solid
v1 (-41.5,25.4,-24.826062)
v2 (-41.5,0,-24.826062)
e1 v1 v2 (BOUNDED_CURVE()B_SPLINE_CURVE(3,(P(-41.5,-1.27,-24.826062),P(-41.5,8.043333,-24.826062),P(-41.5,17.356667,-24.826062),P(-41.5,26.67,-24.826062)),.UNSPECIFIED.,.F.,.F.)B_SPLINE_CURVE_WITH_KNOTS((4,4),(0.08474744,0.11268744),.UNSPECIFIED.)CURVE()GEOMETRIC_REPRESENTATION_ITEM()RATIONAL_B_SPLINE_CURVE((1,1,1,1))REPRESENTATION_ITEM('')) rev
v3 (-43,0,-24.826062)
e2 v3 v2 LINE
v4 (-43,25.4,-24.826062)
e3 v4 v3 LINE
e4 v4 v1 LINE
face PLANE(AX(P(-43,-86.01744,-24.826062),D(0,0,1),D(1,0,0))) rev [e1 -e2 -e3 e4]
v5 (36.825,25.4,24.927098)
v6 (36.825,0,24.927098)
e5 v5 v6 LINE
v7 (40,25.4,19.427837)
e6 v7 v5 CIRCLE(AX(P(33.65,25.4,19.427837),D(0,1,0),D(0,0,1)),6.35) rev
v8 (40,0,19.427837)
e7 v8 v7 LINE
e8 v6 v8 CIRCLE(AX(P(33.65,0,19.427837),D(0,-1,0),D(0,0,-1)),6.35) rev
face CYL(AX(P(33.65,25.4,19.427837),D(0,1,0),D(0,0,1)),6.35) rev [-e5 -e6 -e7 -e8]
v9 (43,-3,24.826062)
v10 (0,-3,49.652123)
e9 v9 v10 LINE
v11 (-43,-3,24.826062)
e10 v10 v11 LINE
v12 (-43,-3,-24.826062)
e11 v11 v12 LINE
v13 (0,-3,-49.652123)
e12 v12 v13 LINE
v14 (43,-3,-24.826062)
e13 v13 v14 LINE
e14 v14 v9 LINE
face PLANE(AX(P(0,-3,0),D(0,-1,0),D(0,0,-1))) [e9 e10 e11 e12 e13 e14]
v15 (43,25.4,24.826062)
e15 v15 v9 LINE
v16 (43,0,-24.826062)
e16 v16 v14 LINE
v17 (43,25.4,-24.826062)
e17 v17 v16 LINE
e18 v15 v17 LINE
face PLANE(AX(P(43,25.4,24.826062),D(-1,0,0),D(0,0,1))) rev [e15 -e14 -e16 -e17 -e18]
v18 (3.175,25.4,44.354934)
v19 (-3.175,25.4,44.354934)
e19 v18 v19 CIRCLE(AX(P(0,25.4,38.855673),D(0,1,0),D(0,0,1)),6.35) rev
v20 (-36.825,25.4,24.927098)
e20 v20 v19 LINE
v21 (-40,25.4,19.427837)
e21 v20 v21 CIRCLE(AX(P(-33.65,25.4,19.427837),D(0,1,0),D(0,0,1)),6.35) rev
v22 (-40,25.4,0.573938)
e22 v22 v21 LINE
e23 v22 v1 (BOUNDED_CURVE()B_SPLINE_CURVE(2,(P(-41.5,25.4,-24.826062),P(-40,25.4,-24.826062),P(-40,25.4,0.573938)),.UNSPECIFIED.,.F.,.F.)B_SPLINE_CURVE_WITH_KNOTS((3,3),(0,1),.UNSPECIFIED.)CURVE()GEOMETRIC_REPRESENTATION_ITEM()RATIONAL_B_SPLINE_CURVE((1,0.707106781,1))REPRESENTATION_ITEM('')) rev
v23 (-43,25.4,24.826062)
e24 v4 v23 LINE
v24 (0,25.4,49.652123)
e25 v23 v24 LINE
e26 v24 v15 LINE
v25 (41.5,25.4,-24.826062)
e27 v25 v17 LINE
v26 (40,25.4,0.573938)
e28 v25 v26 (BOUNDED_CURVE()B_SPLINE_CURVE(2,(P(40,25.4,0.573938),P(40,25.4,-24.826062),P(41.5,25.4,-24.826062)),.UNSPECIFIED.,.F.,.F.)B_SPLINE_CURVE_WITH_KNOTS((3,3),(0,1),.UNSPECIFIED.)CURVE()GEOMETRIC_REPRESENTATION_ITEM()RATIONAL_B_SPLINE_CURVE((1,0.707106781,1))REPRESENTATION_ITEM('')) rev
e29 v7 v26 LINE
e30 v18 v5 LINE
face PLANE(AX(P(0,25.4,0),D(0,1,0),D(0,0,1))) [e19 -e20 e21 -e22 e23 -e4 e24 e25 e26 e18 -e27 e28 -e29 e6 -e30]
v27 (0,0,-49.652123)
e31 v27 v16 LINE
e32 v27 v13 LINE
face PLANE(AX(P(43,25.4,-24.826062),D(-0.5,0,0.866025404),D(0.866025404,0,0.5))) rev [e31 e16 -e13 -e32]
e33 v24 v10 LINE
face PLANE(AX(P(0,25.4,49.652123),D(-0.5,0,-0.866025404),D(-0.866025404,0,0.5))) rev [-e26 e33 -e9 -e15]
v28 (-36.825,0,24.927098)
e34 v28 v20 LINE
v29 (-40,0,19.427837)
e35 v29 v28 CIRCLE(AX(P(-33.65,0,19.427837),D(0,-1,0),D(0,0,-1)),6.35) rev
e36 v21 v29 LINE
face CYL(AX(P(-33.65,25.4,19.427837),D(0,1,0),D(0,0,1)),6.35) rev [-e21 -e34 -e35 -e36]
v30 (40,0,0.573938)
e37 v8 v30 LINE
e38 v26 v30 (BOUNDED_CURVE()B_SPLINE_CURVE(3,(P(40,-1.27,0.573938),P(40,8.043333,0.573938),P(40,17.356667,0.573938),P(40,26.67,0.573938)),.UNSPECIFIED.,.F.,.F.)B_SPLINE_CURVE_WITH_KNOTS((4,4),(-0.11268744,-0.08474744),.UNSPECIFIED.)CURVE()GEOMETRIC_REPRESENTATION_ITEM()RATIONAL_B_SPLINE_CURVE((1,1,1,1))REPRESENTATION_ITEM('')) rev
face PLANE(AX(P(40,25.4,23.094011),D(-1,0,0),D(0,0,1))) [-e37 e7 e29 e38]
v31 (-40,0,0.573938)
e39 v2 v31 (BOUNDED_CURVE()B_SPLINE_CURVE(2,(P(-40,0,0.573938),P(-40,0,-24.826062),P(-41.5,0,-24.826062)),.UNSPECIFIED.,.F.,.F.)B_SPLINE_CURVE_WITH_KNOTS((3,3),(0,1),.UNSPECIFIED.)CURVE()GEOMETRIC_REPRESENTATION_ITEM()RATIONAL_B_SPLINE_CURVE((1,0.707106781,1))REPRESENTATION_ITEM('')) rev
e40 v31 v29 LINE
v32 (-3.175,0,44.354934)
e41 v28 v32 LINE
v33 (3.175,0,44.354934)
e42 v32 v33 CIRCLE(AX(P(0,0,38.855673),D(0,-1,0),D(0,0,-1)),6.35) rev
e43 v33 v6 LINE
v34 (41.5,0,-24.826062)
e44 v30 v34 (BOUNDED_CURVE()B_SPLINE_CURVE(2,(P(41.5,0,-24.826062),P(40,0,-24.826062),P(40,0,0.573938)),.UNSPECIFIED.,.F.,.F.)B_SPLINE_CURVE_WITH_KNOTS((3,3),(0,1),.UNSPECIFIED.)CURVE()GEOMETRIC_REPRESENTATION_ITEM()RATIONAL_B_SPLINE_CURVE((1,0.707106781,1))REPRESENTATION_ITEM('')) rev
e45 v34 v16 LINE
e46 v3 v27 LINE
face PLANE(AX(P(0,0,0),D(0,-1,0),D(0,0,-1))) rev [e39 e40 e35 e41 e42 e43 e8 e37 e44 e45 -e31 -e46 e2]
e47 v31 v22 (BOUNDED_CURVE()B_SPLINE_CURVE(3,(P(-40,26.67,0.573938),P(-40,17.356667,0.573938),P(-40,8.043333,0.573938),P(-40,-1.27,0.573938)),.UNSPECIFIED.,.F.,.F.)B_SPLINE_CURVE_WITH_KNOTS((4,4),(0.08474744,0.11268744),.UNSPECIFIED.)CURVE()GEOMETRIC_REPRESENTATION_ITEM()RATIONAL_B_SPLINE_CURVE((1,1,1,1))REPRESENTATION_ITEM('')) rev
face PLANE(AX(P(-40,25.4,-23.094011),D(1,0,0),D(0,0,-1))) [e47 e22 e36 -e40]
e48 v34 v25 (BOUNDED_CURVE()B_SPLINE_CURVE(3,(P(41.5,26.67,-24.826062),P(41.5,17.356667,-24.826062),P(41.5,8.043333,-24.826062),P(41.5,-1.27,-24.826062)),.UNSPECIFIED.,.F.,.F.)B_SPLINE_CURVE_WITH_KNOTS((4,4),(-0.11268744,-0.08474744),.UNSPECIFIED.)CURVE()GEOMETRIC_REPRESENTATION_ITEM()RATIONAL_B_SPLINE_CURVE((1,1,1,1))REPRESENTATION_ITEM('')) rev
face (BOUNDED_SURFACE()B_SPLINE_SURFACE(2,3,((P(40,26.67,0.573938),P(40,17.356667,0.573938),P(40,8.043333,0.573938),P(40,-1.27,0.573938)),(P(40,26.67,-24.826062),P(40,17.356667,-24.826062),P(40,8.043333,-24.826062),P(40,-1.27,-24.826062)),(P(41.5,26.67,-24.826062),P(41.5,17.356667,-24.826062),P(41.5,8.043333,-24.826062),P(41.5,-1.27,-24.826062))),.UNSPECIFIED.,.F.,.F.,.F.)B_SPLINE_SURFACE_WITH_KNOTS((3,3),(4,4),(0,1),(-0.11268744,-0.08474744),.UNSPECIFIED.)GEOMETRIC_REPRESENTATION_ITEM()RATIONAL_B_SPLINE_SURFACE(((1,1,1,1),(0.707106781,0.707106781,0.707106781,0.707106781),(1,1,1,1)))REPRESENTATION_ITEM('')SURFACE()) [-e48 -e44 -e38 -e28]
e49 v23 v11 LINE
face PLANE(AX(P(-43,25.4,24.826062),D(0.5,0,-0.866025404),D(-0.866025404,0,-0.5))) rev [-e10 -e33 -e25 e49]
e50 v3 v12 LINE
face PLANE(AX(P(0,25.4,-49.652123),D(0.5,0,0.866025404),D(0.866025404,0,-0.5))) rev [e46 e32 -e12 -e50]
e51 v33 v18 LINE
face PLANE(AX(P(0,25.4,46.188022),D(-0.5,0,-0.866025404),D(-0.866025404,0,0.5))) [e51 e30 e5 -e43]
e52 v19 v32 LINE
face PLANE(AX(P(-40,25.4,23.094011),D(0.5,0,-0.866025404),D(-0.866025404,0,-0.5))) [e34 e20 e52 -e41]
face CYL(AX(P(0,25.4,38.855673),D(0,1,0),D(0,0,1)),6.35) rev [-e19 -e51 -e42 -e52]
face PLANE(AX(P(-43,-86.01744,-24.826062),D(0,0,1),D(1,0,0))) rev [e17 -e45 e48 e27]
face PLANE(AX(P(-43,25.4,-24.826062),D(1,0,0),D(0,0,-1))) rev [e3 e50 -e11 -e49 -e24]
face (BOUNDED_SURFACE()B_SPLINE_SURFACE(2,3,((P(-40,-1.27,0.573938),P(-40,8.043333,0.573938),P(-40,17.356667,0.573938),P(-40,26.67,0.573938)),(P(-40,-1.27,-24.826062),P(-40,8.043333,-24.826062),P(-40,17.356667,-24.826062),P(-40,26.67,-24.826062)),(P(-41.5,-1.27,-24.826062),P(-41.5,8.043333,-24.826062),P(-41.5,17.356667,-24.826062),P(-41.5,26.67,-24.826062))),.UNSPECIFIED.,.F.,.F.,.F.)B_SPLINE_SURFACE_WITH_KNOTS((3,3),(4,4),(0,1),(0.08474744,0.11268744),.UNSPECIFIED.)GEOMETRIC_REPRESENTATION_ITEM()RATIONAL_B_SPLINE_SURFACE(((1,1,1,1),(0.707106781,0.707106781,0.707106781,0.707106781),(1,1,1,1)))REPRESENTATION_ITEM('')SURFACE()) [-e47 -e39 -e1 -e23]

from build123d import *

# Parameters (mm, degrees)
BOSS_EXTRUDE1_DEPTH = 25.4
BOSS_EXTRUDE2_DEPTH = 3
CUT_EXTRUDE1_DEPTH  = 25.4
SKETCH3_W           = 86
SKETCH3_H           = 1.732050808
CUT_EXTRUDE2_DEPTH  = 25.4
FILLET1_SIZE        = 1.5
FILLET1_SIZE_2      = 25.4
FILLET2_R           = 6.35


# Read off the part's stored shape, not the designer's step: Cut-Extrude1
with BuildPart() as part:
    # Sketch1 → Boss-Extrude1 (new body)
    with BuildSketch(Plane(origin=(0, 0, 0), x_dir=(1, 0, 0), z_dir=(0, 1, 0))):
        Polygon((43, 24.826061575), (0, 49.65212315), (-43, 24.826061575), (-43, -24.826061575), (0, -49.65212315), (43, -24.826061575), align=None)
        Polygon((-40, -23.094010768), (0, -46.188021535), (40, -23.094010768), (40, 23.094010768), (0, 46.188021535), (-40, 23.094010768), align=None, mode=Mode.SUBTRACT)
    extrude(amount=BOSS_EXTRUDE1_DEPTH)

    # Sketch2 → Boss-Extrude2 (add)
    with BuildSketch(Plane.XZ):
        Polygon((43, 24.826061575), (0, 49.65212315), (-43, 24.826061575), (-43, -24.826061575), (0, -49.65212315), (43, -24.826061575), align=None)
    extrude(amount=BOSS_EXTRUDE2_DEPTH)

    # Cut-Extrude1 outline → Cut-Extrude1 (cut)
    with BuildSketch(Plane(origin=(0, 0, 0), x_dir=(1, 0, 0), z_dir=(0, 1, 0))):
        Polygon((40, 26.558112383), (0, 49.65212315), (-40, 26.558112383), (-40, 23.094010768), (0, 46.188021535), (40, 23.094010768), align=None)
    extrude(amount=CUT_EXTRUDE1_DEPTH, mode=Mode.SUBTRACT)

    # Sketch3 → Cut-Extrude2 (cut)
    with BuildSketch(Plane(origin=(0, 25.4, 0), x_dir=(1, 0, 0), z_dir=(0, 1, 0))):
        with Locations((0, 25.692086979)):
            Rectangle(SKETCH3_W, SKETCH3_H)
    extrude(amount=-CUT_EXTRUDE2_DEPTH, mode=Mode.SUBTRACT)

    # Fillet1
    # an asymmetric fillet: 25.4, 1.5 mm, written as the material it takes off along each edge
    with BuildSketch(Plane(origin=(40, 0, -24.826061575), x_dir=(1, 0, 0), z_dir=(0, 1, 0)), Plane(origin=(-40, 88.9, -24.826061575), x_dir=(-1, 0, 0), z_dir=(0, -1, 0))) as fillet1_piece_1:
        with BuildLine():
            Bezier((FILLET1_SIZE, 0), (0, 0), (0, -FILLET1_SIZE_2), weights=[1, 0.707106781, 1])
            Line((0, -FILLET1_SIZE_2), (0, 0))
            Line((0, 0), (FILLET1_SIZE, 0))
        make_face()
    extrude(amount=88.9, mode=Mode.SUBTRACT)

    # Fillet2
    fillet2_edges = [part.edges().sort_by_distance(p)[0] for p in [
        (-40, 12.7, 23.094010768),
        (0, 12.7, 46.188021535),
        (40, 12.7, 23.094010768),
    ]]
    fillet(fillet2_edges, radius=FILLET2_R)


solid = part.part
